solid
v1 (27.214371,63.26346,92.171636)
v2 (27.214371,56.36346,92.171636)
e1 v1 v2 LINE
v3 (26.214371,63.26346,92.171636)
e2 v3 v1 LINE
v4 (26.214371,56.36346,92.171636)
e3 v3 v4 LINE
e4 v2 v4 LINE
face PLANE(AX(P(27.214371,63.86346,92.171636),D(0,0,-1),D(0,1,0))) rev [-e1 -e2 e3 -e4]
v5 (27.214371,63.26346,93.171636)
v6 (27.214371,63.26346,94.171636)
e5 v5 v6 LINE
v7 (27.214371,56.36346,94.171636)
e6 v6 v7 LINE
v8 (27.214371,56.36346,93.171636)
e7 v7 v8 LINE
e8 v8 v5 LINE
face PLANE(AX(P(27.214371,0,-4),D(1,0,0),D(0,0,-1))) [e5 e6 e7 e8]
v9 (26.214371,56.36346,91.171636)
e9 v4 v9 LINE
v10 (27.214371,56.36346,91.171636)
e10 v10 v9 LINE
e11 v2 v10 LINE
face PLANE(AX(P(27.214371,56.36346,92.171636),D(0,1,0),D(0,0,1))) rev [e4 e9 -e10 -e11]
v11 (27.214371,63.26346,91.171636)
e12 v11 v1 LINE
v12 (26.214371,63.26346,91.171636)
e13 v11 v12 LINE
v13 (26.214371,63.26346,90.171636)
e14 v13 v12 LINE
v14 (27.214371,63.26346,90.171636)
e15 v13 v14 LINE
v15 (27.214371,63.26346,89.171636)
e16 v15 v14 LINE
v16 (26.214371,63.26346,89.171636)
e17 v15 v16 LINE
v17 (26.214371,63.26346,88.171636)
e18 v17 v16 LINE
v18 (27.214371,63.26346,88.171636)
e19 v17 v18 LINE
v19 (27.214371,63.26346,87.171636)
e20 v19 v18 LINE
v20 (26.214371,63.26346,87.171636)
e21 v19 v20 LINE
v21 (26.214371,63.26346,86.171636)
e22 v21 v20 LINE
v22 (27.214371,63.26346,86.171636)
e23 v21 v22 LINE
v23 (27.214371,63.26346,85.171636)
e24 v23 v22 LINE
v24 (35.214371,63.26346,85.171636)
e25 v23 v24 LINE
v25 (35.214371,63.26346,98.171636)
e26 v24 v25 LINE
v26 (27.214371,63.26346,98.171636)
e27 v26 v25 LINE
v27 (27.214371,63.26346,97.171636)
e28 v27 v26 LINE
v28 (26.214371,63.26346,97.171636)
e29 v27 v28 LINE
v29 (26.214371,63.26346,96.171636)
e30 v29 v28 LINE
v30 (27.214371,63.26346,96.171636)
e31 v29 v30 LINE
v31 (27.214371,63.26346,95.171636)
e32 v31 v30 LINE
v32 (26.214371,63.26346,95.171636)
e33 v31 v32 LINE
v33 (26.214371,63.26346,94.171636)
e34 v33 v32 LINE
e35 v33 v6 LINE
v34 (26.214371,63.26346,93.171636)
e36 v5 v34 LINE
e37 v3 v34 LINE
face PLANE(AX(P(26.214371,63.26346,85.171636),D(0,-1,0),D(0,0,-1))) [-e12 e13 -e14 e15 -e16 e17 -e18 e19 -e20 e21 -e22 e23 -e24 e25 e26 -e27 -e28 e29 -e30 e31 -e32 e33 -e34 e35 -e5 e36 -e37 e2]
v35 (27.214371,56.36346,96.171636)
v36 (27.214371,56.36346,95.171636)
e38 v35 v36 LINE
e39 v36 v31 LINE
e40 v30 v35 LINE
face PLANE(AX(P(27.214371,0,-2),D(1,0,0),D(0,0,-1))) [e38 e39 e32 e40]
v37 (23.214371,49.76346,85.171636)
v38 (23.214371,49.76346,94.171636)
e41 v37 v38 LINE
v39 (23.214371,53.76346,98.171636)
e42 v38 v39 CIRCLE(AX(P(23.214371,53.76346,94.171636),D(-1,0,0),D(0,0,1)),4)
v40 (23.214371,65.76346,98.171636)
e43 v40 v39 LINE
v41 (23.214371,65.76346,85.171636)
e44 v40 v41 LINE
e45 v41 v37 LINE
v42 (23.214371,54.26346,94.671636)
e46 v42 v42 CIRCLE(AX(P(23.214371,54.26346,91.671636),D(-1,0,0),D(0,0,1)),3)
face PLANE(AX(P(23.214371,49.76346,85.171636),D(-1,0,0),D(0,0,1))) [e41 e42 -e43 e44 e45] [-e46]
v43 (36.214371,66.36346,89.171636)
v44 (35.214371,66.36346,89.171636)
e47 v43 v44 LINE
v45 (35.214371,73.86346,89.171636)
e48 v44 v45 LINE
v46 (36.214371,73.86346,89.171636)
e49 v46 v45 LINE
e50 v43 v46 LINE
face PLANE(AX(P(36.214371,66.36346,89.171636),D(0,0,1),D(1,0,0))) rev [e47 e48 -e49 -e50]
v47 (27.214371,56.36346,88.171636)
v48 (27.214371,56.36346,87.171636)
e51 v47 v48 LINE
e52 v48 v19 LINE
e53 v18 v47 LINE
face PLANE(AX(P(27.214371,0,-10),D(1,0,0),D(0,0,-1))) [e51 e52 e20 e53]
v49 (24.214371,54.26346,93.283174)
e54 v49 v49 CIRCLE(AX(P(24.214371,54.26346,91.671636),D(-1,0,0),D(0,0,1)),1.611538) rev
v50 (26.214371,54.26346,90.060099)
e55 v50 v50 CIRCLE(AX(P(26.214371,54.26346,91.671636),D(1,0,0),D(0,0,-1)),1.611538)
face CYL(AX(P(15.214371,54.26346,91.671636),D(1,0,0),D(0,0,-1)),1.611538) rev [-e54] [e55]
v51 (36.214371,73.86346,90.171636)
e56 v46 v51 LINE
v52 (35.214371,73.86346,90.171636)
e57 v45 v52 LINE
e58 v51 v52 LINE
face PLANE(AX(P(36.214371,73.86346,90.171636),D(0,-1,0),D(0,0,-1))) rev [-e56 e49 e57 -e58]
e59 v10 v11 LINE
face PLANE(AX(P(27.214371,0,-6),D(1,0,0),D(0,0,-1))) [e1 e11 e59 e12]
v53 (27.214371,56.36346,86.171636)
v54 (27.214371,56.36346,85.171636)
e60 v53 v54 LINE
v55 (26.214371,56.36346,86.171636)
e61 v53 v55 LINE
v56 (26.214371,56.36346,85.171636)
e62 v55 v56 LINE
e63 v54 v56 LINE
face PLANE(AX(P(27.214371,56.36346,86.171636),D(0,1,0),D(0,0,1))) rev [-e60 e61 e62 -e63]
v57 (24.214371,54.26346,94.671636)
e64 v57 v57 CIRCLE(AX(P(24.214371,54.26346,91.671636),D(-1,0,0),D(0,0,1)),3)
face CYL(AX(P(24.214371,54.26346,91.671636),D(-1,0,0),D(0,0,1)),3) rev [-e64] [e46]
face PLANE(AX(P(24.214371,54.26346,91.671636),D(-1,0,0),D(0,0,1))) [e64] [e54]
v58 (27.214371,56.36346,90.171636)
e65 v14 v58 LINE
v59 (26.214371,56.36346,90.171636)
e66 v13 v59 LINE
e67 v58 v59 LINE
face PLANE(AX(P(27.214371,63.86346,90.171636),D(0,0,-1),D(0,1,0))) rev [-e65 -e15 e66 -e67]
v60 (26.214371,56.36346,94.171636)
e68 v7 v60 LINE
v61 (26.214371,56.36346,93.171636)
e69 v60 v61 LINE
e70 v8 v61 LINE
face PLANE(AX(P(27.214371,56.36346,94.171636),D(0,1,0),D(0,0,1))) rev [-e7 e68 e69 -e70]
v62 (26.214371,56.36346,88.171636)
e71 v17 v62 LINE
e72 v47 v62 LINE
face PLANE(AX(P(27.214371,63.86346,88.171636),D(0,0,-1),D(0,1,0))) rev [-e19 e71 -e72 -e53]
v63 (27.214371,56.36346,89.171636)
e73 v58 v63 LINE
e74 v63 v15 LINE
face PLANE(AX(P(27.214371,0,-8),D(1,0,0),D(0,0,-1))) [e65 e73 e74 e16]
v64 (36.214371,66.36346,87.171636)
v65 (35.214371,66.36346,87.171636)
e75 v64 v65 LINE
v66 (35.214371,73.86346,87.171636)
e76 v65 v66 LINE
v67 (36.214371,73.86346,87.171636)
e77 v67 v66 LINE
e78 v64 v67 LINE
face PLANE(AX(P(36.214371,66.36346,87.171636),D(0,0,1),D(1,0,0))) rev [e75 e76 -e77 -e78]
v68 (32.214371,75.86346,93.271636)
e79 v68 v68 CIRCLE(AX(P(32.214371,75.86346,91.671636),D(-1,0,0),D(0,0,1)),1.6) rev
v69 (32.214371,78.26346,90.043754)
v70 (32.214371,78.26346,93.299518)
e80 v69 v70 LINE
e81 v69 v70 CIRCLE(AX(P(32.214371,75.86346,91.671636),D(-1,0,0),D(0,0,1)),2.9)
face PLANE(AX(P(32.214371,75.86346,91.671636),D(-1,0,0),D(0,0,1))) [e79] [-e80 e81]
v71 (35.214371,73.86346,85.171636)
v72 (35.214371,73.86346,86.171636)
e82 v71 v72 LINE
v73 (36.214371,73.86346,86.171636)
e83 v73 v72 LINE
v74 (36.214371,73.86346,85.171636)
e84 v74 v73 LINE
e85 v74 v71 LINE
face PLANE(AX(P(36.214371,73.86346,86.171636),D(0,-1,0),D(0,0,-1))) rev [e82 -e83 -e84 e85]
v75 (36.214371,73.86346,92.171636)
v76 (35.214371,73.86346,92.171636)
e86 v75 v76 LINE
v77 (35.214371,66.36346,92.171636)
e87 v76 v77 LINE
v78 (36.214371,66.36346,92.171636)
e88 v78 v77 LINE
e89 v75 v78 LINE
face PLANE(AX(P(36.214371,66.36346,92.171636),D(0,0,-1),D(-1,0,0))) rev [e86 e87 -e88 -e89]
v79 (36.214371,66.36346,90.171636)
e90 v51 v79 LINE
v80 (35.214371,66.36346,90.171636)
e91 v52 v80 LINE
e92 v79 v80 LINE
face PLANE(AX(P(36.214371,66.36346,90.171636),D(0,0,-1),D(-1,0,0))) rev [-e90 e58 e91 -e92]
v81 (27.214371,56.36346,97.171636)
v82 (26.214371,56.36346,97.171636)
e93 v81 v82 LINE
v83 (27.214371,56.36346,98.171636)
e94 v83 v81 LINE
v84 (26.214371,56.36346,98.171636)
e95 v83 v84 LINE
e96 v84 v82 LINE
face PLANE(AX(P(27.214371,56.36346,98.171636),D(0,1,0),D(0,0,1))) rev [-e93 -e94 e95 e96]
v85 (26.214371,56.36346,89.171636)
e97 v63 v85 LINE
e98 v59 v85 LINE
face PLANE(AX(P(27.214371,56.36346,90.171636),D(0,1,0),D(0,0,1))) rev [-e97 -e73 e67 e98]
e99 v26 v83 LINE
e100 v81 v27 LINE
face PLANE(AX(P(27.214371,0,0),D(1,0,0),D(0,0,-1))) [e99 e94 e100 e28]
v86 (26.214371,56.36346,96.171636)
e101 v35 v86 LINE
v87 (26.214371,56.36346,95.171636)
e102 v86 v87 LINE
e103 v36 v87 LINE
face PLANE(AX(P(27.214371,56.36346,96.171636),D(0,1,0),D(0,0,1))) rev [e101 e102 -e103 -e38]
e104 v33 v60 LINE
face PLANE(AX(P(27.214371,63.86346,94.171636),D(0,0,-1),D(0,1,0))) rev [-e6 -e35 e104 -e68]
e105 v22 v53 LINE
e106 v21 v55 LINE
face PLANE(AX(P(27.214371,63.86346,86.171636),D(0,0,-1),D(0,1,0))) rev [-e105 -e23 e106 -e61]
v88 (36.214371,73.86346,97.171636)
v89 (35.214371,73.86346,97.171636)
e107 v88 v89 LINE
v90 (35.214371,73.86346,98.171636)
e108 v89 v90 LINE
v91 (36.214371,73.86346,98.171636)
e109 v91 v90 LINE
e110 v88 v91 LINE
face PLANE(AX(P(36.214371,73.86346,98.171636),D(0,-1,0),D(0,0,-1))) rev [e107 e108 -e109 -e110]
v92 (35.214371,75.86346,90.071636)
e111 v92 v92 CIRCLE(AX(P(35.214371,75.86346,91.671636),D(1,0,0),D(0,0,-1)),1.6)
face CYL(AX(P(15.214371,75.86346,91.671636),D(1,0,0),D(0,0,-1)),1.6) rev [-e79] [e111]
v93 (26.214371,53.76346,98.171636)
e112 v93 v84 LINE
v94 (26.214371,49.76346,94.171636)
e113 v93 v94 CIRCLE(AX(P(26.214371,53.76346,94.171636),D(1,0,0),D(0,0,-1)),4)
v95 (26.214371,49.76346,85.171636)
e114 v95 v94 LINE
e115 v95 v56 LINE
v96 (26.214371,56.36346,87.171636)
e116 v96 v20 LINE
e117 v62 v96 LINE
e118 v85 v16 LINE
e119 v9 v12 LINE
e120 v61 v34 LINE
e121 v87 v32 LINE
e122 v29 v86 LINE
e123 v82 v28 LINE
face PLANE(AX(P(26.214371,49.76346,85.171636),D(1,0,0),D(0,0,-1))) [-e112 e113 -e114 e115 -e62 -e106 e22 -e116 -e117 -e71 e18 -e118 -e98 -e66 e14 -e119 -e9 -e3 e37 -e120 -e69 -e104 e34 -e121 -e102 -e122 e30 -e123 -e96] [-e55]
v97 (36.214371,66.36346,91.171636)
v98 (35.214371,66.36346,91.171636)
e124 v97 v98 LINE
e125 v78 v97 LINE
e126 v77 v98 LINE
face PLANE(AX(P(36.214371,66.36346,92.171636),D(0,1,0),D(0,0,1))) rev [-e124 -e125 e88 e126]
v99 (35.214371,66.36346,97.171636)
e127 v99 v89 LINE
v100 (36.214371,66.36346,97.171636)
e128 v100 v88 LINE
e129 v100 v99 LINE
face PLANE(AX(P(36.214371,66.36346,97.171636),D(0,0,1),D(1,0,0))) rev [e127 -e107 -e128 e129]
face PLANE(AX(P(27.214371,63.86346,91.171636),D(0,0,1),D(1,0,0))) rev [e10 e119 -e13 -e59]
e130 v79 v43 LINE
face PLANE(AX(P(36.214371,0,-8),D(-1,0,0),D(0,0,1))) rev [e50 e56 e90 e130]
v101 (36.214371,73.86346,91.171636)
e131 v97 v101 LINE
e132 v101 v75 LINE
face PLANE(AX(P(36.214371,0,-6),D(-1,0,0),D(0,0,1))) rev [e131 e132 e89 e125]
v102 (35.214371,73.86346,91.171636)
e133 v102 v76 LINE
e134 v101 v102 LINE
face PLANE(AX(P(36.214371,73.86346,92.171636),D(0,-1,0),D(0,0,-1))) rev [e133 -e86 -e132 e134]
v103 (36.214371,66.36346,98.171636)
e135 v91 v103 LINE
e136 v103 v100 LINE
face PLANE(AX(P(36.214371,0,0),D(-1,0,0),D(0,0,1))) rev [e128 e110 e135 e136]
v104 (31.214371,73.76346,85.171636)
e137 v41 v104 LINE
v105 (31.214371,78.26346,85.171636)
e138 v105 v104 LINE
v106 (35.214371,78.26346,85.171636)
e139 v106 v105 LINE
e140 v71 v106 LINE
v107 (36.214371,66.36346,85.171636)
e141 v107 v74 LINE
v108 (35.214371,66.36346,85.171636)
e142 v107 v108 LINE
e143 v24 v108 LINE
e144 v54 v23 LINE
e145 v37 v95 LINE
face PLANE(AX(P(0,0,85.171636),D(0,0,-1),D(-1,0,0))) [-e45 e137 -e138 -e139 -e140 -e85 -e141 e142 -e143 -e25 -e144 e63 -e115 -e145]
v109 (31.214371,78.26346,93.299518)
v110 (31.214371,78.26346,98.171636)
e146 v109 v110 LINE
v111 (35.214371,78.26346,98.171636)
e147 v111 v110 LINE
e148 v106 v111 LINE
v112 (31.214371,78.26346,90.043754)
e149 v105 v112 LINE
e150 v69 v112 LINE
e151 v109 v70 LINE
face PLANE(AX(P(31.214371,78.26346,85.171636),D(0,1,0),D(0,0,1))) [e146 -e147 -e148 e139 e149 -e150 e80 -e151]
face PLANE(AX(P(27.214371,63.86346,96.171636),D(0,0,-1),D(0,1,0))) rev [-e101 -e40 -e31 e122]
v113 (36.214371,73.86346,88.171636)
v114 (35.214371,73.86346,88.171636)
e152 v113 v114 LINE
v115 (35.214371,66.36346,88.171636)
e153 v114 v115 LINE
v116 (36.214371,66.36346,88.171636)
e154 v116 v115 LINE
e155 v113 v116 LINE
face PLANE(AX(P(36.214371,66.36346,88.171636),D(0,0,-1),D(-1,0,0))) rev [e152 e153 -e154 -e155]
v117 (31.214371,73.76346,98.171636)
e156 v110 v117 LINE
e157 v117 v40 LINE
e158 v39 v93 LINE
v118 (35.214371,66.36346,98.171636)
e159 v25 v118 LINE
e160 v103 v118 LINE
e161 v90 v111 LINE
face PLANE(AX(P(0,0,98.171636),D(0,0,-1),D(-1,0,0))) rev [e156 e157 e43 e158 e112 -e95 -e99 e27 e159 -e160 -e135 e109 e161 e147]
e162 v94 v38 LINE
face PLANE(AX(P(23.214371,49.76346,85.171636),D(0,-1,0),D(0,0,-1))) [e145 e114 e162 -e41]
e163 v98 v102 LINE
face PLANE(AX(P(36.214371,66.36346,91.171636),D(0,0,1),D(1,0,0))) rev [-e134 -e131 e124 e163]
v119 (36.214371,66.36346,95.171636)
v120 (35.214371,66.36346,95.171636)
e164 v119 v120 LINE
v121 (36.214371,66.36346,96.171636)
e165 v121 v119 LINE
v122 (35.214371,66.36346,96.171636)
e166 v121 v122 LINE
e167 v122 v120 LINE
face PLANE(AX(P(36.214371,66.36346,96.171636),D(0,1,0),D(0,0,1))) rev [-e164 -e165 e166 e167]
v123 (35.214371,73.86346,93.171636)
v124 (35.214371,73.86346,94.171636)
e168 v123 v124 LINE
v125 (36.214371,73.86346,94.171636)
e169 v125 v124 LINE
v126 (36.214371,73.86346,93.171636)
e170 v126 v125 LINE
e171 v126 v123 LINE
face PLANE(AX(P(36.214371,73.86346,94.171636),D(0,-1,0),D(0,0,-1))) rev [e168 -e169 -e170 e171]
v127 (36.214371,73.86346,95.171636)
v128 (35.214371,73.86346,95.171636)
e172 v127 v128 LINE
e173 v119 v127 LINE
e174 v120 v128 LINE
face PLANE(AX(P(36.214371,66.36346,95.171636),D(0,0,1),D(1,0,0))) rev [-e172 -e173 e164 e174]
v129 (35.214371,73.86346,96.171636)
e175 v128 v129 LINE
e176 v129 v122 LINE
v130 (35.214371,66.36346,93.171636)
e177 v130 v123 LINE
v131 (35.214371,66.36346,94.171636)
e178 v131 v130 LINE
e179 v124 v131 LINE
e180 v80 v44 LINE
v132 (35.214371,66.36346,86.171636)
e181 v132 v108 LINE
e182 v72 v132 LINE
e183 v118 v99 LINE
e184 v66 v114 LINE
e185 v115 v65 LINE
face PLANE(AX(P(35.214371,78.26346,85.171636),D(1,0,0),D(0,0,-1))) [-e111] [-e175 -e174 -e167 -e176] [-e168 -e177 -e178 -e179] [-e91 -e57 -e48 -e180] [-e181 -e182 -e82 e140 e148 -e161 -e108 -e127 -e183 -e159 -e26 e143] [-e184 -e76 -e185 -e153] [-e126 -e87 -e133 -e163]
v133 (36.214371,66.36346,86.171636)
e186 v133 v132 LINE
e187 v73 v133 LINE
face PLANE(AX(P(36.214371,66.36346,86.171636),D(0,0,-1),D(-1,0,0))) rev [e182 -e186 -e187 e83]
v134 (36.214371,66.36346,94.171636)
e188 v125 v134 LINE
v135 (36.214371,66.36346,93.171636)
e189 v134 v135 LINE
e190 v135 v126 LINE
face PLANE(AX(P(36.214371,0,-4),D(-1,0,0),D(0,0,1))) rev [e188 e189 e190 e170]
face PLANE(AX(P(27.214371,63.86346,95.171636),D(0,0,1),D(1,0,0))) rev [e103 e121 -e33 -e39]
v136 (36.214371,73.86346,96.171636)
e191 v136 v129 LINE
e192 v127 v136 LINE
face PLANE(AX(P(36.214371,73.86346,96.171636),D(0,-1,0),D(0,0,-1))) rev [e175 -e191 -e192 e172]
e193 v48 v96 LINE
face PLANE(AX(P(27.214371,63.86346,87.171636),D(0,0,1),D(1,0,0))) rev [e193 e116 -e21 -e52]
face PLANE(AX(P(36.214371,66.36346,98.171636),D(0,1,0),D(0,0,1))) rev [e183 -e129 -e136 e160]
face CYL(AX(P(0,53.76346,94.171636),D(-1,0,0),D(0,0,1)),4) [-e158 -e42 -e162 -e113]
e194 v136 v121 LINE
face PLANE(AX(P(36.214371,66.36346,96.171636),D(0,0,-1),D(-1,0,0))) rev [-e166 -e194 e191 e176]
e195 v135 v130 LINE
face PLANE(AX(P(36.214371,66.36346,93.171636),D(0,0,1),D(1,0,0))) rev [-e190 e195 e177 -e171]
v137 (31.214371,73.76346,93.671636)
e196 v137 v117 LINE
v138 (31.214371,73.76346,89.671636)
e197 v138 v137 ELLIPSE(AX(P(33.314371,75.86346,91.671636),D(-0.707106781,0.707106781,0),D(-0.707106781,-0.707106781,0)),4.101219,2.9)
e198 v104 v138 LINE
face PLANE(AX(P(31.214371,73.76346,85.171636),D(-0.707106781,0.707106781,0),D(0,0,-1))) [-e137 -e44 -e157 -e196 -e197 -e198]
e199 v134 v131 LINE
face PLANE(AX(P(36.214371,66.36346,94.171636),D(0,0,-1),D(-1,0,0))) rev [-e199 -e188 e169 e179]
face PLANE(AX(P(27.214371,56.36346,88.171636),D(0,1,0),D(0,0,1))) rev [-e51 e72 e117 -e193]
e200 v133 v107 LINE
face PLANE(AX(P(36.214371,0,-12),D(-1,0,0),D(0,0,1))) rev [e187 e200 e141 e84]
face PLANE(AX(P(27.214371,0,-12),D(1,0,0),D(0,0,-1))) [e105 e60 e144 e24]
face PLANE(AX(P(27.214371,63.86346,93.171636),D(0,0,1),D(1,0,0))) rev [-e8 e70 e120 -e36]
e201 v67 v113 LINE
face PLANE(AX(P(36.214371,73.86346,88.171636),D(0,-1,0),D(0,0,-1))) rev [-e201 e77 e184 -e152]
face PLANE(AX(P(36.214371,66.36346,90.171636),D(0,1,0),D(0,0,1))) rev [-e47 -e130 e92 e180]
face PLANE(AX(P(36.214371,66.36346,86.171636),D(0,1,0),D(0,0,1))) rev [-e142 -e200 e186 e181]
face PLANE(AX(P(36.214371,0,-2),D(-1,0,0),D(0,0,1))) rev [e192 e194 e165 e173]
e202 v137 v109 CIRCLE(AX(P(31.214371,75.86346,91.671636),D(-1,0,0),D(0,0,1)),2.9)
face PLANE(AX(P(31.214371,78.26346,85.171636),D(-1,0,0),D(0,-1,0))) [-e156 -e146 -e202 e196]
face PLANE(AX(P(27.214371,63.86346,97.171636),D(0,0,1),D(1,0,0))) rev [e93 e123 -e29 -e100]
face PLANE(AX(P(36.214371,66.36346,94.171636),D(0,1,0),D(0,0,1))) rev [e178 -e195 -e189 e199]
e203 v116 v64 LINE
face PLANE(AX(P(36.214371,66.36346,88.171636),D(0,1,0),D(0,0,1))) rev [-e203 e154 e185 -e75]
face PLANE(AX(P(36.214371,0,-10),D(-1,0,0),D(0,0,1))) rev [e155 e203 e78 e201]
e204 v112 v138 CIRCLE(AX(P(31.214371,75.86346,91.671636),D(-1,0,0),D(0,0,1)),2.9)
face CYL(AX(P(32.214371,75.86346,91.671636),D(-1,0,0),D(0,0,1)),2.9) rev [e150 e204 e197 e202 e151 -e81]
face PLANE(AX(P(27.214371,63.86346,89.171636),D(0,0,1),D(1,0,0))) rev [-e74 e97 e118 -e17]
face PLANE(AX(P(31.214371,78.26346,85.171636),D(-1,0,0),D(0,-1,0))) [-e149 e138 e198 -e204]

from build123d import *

# Parameters (mm, degrees)
BOSS_EXTRUDE1_DEPTH = 13
SKETCH2_R           = 1.6
SKETCH2_R_2         = 1.611537585
CUT_EXTRUDE1_DEPTH  = 20
SKETCH3_R           = 3
CUT_EXTRUDE2_DEPTH  = 1
SKETCH4_R           = 2.9
CUT_EXTRUDE3_DEPTH  = 1
SKETCH5_W           = 1
SKETCH5_H           = 7.5
BOSS_EXTRUDE2_DEPTH = 1
LPATTERN1_COUNT     = 7
LPATTERN1_PITCH     = 2
SKETCH6_W           = 1
SKETCH6_H           = 7.5
BOSS_EXTRUDE3_DEPTH = 1
LPATTERN2_COUNT     = 7
LPATTERN2_PITCH     = 2
CHAMFER1_SIZE       = 10
FILLET1_R           = 4


with BuildPart() as part:
    # Sketch1 → Boss-Extrude1 (new body)
    with BuildSketch(Plane.XY.offset(98.171636097)):
        Polygon((31.214370899, 78.263460463), (35.214370899, 78.263460463), (35.214370899, 66.863460463), (35.214370899, 63.263460463), (26.214370899, 63.263460463), (26.214370899, 49.763460463), (23.214370899, 49.763460463), (23.214370899, 63.263460463), (23.214370899, 63.763460463), (31.214370899, 63.763460463), align=None)
    extrude(amount=-BOSS_EXTRUDE1_DEPTH)

    # Sketch2 → Cut-Extrude1 (cut)
    with BuildSketch(Plane(origin=(35.214370899, 0, 0), x_dir=(0, 0, -1), z_dir=(1, 0, 0))):
        with Locations((-91.671636097, 75.863460463)):
            Circle(SKETCH2_R)
        with Locations((-91.671636097, 54.263460463)):
            Circle(SKETCH2_R_2)
    extrude(amount=-CUT_EXTRUDE1_DEPTH, mode=Mode.SUBTRACT)

    # Sketch3 → Cut-Extrude2 (cut)
    with BuildSketch(Plane.ZY.offset(-23.214370899)):
        with Locations((91.671636097, 54.263460463)):
            Circle(SKETCH3_R)
    extrude(amount=-CUT_EXTRUDE2_DEPTH, mode=Mode.SUBTRACT)

    # Sketch4 → Cut-Extrude3 (cut)
    with BuildSketch(Plane.ZY.offset(-31.214370899)):
        with Locations((91.671636097, 75.863460463)):
            Circle(SKETCH4_R)
    extrude(amount=-CUT_EXTRUDE3_DEPTH, mode=Mode.SUBTRACT)

    # Sketch5 → Boss-Extrude2 (add)
    with BuildSketch(Plane(origin=(35.214370899, 0, 0), x_dir=(0, 0, -1), z_dir=(1, 0, 0))):
        with Locations((-97.671636097, 70.113460463)):
            Rectangle(SKETCH5_W, SKETCH5_H)
    boss_extrude2 = extrude(amount=BOSS_EXTRUDE2_DEPTH)

    # LPattern1: Boss-Extrude2 ×7
    with Locations(*[(0, 0, -i * LPATTERN1_PITCH) for i in range(1, LPATTERN1_COUNT)]):
        add(boss_extrude2)

    # Sketch6 → Boss-Extrude3 (add)
    with BuildSketch(Plane(origin=(26.214370899, 0, 0), x_dir=(0, 0, -1), z_dir=(1, 0, 0))):
        with Locations((-97.671636097, 60.113460463)):
            Rectangle(SKETCH6_W, SKETCH6_H)
    boss_extrude3 = extrude(amount=BOSS_EXTRUDE3_DEPTH)

    # LPattern2: Boss-Extrude3 ×7
    with Locations(*[(0, 0, -i * LPATTERN2_PITCH) for i in range(1, LPATTERN2_COUNT)]):
        add(boss_extrude3)

    # Chamfer1
    # the kernel refuses this chamfer: 10 mm, written as the material it adds along each edge
    with BuildSketch(Plane(origin=(31.214370899, 63.763460463, 98.171636097), x_dir=(0.027495876610585647, 0.9996219169112968, 0), z_dir=(0, 0, -1))) as chamfer1_piece_1_section:
        Polygon((CHAMFER1_SIZE * 0.999621916911, -CHAMFER1_SIZE * 0.0274958766106), (-CHAMFER1_SIZE * 0.0274958766106, -CHAMFER1_SIZE * 0.999621916911), (0, 0), align=None)
    chamfer1_piece_1 = extrude(amount=13, mode=Mode.PRIVATE)
    chamfer1_piece_1 = chamfer1_piece_1 - Plane(origin=(28.210743814, 75.863460463, 91.671636097), x_dir=(0, 0, 1), z_dir=(-1, 0, 0)) * Cylinder(2.9, 66, mode=Mode.PRIVATE)
    chamfer1_piece_1 = split(chamfer1_piece_1, bisect_by=Plane(origin=(23.214370899, 67.201513325, 91.671636099), z_dir=(1, 0, 0)), keep=Keep.TOP, mode=Mode.PRIVATE)
    add(chamfer1_piece_1)

    # Fillet1
    fillet1_edges = [part.edges().sort_by_distance(p)[0] for p in [
        (24.714370899, 49.763460463, 98.171636097),
    ]]
    fillet(fillet1_edges, radius=FILLET1_R)


solid = part.part
